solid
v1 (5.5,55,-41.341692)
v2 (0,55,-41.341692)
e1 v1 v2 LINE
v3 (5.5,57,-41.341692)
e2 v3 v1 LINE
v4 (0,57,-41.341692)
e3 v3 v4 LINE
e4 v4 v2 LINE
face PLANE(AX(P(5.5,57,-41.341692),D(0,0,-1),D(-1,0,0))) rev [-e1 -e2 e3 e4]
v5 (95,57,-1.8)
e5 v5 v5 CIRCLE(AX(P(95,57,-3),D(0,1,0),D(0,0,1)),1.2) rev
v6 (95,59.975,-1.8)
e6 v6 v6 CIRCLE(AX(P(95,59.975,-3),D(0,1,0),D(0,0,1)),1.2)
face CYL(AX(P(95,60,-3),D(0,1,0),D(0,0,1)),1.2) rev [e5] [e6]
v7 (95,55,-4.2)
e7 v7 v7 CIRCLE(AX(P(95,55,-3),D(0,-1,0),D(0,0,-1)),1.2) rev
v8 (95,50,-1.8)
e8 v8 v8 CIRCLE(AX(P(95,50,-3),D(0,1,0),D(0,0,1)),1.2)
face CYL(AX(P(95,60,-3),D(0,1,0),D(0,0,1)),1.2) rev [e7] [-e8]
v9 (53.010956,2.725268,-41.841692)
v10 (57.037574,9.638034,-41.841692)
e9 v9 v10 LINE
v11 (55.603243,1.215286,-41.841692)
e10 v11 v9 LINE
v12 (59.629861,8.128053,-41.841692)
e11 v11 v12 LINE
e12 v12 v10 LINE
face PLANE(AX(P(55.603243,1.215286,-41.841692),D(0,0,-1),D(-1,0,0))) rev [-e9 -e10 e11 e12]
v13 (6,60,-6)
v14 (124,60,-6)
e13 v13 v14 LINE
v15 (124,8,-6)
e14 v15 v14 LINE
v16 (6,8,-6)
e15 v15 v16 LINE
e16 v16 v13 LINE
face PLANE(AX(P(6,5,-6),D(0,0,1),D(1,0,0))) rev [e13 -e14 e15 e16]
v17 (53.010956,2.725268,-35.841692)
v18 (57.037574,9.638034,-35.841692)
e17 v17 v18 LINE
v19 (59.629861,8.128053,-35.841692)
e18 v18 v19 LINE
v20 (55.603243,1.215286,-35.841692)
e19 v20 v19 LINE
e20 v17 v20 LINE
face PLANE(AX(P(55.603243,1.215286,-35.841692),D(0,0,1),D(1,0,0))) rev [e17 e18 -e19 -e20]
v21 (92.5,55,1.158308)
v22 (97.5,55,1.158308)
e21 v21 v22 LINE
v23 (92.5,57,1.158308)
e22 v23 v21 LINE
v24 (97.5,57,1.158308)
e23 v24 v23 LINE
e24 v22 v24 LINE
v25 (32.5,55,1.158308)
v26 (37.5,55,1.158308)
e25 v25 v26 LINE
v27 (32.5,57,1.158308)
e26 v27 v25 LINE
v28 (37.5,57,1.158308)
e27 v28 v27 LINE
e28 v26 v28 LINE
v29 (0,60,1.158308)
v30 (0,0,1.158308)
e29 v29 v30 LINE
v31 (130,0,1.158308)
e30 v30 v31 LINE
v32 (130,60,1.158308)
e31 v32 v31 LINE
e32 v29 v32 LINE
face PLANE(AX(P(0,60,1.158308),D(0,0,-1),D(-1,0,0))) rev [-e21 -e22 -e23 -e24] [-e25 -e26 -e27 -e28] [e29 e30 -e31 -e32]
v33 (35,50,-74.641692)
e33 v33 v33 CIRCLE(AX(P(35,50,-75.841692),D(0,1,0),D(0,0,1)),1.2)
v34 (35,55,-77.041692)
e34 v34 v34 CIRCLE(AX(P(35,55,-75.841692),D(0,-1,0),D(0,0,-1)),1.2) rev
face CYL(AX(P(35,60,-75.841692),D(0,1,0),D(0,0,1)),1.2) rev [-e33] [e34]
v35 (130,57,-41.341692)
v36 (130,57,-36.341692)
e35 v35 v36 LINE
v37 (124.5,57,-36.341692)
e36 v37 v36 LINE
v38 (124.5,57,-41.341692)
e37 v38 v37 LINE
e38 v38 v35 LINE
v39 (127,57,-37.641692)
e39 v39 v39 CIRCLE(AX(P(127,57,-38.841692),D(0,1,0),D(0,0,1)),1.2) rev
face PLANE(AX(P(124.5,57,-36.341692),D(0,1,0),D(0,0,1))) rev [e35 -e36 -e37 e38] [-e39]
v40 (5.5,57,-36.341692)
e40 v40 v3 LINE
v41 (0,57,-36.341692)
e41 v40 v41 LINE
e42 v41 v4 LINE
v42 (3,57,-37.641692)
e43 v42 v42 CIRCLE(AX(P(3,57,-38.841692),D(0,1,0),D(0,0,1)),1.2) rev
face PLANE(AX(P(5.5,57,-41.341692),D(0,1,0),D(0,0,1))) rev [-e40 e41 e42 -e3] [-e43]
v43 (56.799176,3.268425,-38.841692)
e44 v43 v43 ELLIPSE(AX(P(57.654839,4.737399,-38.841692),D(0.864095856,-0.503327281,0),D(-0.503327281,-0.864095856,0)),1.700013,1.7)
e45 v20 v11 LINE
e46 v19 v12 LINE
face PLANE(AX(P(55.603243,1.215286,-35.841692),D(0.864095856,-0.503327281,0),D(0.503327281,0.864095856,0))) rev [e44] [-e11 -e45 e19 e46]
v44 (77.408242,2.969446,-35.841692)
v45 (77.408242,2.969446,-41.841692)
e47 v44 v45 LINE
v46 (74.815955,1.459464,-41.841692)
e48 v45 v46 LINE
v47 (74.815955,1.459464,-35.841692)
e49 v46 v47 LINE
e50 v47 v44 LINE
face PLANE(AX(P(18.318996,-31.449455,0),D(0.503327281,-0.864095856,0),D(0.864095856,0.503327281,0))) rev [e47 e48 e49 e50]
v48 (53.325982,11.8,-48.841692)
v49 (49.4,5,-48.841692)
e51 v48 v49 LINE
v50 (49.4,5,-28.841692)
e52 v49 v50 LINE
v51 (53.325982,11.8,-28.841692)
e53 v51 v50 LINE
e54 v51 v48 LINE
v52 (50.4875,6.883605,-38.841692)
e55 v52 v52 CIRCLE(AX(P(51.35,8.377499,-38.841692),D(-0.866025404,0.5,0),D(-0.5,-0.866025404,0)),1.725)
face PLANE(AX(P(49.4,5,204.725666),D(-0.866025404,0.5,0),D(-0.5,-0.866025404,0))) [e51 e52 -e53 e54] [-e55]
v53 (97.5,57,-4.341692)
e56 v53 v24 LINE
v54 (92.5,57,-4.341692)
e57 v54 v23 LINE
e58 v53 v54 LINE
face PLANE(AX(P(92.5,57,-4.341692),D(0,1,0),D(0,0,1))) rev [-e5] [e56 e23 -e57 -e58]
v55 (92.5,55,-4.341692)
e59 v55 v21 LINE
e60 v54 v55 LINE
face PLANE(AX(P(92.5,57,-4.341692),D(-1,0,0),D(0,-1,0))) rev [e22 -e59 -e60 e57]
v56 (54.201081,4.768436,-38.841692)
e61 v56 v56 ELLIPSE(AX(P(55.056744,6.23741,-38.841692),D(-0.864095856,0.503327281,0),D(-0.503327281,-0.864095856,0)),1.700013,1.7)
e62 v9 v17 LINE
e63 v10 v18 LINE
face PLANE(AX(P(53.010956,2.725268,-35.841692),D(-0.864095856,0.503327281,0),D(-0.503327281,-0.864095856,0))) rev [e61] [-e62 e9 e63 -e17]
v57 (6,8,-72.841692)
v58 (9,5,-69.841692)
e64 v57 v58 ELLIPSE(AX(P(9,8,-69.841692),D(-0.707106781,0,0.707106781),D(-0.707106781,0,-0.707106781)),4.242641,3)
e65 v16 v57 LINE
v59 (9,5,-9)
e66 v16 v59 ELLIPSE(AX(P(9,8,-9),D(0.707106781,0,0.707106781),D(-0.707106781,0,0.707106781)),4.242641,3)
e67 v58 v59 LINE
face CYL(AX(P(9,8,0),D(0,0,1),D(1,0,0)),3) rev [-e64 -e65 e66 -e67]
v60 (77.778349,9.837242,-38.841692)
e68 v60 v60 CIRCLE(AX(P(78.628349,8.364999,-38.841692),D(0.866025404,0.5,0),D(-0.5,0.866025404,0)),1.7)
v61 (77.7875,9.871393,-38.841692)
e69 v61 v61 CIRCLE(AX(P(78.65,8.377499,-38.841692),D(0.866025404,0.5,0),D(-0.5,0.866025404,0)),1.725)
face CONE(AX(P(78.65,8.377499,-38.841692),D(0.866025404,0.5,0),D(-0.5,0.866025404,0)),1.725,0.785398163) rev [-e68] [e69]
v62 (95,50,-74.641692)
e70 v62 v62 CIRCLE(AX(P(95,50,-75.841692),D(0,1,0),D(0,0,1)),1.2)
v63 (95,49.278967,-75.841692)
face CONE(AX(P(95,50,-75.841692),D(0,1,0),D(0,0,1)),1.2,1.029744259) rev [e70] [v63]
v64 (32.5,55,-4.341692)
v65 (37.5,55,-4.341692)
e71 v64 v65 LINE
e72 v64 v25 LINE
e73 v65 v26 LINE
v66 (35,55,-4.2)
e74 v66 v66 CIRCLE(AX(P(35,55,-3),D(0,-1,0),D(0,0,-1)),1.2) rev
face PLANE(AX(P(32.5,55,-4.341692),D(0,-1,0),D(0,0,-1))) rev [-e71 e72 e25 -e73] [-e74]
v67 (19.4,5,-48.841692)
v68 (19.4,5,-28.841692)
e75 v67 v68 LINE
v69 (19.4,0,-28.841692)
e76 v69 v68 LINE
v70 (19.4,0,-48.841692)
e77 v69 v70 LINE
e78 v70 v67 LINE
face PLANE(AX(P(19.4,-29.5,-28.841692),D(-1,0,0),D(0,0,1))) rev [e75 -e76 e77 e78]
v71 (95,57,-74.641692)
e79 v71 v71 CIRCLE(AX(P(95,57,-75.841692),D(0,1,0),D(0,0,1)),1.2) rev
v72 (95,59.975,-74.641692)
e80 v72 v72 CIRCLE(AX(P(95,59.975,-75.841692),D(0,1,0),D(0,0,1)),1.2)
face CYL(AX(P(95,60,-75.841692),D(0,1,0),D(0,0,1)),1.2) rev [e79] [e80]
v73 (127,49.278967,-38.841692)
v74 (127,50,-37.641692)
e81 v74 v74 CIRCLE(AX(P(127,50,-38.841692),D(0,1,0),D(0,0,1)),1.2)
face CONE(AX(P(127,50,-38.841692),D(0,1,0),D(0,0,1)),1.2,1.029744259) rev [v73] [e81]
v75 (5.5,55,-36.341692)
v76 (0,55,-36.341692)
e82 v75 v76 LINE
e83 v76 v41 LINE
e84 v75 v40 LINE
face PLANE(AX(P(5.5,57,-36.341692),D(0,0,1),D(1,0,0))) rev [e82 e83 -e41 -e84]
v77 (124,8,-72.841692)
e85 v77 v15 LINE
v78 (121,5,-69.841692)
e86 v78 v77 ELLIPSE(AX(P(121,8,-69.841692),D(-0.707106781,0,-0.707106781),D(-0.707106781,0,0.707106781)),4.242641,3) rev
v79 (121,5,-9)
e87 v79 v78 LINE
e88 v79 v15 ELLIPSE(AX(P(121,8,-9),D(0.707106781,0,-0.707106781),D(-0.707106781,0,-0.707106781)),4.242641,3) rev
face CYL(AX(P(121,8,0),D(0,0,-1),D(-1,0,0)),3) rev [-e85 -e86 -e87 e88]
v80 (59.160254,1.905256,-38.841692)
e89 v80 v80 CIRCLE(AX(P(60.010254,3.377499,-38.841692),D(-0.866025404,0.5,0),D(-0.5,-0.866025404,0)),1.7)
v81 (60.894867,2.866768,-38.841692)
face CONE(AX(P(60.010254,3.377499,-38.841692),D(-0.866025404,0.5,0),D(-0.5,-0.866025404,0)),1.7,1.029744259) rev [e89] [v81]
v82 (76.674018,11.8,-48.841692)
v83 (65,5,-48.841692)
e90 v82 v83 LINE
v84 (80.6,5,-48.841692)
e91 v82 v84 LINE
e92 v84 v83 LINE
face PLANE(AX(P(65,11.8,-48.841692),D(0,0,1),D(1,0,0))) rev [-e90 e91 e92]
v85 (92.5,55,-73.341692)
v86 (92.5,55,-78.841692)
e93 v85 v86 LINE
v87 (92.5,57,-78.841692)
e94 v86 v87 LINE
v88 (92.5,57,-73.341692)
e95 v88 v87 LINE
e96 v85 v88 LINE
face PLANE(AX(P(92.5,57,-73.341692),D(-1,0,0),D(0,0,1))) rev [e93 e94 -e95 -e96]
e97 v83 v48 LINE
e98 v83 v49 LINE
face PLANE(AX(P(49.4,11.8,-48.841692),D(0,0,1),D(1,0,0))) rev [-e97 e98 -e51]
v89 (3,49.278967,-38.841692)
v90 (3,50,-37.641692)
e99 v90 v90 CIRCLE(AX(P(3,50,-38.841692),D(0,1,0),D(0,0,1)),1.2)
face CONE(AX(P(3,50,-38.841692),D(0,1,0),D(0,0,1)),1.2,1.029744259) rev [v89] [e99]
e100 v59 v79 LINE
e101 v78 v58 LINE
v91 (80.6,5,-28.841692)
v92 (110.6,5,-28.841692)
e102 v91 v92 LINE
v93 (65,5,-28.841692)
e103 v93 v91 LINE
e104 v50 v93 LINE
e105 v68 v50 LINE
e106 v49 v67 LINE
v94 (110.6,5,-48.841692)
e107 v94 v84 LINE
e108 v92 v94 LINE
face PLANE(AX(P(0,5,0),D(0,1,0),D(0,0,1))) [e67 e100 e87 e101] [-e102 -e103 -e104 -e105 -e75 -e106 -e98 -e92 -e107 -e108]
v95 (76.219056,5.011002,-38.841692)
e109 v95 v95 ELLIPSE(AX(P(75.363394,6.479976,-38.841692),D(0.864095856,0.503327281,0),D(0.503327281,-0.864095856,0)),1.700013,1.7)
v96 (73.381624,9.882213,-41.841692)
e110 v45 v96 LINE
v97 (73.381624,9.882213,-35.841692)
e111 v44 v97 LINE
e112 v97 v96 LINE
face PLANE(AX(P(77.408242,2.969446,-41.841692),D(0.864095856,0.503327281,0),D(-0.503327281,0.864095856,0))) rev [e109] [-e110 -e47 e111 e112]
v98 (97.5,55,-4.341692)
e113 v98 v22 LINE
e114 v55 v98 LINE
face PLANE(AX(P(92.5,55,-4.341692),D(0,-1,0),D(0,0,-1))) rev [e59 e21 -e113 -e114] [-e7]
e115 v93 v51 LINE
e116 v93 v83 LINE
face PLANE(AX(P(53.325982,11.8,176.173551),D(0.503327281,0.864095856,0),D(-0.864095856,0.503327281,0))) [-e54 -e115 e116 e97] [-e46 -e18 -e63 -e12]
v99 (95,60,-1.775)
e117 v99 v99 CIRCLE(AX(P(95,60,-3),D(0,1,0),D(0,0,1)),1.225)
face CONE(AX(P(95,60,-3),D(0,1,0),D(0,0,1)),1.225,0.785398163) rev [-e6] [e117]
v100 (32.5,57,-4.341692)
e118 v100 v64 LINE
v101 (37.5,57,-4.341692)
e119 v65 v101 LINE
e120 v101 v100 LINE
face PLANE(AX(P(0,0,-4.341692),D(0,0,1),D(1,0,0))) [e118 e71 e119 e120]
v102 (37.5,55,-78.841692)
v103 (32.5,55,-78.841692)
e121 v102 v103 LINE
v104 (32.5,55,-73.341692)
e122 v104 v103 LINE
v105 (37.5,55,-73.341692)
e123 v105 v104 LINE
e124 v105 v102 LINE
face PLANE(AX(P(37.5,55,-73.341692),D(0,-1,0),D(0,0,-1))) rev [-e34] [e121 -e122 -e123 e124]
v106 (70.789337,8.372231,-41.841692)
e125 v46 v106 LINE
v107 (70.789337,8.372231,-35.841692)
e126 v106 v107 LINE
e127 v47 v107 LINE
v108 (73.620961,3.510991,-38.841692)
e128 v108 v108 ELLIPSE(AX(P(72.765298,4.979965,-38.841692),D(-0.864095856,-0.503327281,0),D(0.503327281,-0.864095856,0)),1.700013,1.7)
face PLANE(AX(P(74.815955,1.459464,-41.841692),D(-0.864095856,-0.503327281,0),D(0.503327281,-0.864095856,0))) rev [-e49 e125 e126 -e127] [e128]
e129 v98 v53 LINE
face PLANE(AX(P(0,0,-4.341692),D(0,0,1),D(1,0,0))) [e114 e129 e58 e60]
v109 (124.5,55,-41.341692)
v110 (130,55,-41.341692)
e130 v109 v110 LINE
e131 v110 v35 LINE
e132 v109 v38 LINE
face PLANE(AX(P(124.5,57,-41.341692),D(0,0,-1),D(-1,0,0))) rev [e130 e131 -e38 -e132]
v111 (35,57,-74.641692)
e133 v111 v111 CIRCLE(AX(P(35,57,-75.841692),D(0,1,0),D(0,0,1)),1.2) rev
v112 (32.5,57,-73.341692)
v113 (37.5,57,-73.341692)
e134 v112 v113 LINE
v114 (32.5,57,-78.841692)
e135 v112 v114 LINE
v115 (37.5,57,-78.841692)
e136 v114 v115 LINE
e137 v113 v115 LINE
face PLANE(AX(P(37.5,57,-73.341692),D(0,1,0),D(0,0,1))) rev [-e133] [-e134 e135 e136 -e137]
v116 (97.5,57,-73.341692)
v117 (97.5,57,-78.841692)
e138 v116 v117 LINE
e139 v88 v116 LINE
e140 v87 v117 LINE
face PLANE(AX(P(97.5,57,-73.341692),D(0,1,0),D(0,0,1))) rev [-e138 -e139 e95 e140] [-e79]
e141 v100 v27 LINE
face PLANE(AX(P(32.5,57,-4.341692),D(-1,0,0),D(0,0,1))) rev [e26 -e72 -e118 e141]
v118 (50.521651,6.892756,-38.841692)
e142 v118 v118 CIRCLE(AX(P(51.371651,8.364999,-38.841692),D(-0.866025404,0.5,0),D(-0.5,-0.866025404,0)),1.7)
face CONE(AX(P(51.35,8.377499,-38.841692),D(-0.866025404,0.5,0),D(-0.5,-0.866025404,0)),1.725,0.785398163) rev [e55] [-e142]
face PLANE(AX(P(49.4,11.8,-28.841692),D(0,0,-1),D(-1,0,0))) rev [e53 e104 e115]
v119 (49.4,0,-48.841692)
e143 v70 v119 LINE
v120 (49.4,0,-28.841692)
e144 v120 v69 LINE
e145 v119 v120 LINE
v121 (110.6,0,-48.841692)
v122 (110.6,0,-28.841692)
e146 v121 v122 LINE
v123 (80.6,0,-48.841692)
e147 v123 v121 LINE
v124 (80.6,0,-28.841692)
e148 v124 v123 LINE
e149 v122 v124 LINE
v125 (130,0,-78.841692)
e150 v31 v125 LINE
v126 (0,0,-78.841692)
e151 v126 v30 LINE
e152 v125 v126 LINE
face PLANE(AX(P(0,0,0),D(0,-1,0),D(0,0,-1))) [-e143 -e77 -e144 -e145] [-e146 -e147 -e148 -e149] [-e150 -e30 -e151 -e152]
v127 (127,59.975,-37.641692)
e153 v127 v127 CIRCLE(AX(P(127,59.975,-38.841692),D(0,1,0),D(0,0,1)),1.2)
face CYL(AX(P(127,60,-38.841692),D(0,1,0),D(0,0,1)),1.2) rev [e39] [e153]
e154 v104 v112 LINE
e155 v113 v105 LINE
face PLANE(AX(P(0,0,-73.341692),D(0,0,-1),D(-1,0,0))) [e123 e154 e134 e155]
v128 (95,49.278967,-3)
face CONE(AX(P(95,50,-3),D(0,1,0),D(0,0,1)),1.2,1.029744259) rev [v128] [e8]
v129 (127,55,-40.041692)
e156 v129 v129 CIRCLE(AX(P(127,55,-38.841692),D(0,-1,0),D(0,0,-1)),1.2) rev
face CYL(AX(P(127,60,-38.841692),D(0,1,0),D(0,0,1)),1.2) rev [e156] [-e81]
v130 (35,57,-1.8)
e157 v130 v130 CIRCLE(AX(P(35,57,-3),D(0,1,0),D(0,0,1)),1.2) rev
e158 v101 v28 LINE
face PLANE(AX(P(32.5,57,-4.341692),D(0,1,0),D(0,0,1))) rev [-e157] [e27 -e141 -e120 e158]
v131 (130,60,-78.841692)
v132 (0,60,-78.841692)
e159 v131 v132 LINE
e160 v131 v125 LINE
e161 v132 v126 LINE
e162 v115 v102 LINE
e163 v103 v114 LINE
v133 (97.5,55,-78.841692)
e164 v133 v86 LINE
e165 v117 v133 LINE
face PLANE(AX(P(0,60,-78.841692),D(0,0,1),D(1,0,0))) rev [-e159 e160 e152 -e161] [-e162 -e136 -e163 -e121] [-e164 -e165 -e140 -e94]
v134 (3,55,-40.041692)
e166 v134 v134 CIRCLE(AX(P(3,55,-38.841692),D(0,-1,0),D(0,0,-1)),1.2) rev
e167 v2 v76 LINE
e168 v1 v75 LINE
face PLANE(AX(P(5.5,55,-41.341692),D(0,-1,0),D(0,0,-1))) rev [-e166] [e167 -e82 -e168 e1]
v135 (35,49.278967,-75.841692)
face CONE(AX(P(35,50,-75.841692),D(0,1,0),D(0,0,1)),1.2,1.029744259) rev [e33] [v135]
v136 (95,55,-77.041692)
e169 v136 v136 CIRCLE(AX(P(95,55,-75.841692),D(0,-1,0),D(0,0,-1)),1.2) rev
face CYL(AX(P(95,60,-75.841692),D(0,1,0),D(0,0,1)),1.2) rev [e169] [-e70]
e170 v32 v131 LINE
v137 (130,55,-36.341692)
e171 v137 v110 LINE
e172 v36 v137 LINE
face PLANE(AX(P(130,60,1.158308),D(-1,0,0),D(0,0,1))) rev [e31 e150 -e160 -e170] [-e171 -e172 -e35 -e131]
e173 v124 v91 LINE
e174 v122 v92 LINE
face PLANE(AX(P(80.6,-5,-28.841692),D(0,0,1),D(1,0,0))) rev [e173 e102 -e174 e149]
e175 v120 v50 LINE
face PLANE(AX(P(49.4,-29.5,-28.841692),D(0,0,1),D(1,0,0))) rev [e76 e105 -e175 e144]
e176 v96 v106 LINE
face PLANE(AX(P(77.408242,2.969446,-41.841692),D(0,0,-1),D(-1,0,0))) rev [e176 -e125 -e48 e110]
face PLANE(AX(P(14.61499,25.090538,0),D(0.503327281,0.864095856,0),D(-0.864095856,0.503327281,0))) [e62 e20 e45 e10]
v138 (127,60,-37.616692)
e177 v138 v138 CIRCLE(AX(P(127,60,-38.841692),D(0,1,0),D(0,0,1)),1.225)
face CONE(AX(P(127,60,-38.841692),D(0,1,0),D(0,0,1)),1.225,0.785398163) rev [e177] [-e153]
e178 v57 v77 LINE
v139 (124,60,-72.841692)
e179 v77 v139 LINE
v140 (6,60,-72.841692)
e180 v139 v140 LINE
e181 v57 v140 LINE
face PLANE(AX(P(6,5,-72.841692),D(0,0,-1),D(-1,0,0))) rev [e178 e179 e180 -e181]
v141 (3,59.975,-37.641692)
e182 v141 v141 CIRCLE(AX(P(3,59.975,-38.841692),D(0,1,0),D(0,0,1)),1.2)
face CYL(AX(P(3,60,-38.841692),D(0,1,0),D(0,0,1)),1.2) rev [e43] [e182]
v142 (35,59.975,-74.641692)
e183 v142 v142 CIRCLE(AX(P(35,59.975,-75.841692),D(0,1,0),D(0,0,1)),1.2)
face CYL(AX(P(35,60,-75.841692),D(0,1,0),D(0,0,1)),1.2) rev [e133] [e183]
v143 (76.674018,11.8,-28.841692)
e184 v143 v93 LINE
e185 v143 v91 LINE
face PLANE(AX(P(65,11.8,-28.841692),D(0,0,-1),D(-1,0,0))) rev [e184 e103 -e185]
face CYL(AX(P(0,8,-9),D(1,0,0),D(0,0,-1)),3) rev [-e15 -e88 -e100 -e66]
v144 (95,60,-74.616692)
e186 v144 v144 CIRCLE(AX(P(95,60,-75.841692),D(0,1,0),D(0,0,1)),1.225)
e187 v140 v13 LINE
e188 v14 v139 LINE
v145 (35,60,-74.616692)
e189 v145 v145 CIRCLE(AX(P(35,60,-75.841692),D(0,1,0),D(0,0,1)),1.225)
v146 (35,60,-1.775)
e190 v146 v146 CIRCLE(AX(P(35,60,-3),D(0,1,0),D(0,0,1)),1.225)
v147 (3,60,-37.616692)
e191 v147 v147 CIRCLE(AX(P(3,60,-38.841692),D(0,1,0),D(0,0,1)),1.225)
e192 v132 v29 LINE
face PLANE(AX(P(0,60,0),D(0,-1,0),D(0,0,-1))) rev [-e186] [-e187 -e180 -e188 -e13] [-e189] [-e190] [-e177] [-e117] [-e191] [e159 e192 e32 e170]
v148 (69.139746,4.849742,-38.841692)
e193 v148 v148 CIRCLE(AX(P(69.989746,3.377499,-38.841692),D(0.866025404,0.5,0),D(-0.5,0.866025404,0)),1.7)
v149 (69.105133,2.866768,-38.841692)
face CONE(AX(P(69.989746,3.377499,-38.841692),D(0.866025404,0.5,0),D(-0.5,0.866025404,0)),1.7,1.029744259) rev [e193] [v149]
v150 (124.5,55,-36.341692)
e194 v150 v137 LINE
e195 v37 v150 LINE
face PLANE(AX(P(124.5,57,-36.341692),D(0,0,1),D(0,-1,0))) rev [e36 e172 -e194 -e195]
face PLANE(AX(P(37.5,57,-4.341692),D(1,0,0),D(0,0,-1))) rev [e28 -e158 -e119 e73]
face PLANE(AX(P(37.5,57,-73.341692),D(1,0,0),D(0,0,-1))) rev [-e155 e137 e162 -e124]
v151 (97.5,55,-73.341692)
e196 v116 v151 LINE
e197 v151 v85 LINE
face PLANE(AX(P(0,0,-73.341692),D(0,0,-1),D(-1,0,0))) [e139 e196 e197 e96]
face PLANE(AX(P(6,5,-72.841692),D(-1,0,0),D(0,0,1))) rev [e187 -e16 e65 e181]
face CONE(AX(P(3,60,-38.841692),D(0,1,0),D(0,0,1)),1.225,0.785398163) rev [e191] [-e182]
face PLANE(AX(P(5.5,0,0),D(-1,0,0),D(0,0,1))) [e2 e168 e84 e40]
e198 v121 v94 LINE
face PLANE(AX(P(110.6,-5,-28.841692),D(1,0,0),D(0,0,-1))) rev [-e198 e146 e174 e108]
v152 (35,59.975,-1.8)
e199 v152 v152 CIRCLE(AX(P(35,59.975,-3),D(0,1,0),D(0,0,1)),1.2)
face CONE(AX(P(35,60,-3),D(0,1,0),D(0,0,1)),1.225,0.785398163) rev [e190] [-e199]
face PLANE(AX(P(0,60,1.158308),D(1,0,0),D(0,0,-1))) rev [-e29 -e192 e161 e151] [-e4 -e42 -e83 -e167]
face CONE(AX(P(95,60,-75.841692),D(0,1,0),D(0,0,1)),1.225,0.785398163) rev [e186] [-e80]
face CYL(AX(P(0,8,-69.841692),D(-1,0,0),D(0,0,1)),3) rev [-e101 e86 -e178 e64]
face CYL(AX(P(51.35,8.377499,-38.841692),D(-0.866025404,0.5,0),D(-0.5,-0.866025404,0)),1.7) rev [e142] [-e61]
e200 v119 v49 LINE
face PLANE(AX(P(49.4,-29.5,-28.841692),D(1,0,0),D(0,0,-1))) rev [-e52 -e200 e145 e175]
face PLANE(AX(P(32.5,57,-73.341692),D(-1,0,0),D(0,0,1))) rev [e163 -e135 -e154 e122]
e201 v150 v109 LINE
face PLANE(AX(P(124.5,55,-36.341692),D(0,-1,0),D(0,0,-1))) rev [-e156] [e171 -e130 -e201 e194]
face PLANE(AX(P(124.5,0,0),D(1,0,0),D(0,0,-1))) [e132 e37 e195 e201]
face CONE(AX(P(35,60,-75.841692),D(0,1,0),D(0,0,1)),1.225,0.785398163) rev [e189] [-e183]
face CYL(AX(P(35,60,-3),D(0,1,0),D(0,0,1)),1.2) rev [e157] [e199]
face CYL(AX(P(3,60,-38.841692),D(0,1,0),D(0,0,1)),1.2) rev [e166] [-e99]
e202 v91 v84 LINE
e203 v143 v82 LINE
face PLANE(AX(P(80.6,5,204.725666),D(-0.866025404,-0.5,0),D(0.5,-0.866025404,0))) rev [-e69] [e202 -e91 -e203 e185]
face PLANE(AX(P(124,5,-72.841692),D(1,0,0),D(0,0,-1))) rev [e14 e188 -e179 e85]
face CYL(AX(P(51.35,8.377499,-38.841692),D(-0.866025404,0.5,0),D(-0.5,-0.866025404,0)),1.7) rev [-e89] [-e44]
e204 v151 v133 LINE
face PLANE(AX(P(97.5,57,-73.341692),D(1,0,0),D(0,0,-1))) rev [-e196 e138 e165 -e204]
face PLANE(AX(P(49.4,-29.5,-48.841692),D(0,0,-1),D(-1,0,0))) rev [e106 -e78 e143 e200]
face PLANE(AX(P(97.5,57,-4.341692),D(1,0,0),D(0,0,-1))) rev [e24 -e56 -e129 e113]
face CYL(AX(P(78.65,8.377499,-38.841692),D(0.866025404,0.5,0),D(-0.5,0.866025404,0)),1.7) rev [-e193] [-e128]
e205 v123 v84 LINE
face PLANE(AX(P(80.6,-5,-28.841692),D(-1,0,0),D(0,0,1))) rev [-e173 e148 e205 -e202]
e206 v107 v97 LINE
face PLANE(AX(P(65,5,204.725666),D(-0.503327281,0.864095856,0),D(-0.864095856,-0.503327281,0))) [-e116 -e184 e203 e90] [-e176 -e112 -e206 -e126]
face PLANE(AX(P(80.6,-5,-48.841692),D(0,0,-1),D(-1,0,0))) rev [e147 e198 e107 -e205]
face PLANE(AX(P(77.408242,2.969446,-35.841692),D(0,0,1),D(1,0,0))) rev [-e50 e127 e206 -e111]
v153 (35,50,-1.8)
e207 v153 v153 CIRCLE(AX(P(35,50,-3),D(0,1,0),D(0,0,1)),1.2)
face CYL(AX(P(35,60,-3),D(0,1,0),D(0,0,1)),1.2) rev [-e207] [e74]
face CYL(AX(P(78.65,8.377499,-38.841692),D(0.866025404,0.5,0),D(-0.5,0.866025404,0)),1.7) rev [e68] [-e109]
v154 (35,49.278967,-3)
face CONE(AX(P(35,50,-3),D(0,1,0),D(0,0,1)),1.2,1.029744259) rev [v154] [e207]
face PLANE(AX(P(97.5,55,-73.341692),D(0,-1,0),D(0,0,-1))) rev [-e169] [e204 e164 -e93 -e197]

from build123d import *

# Parameters (mm, degrees)
SKIZZE1_W                                  = 130
SKIZZE1_H                                  = 80
AUFSATZ_LINEAR_AUSTRAGEN1_DEPTH            = 60
SKIZZE2_W                                  = 118
SKIZZE2_H                                  = 66.841692054
SCHNITT_LINEAR_AUSTRAGEN1_DEPTH            = 55
SKIZZE3_W                                  = 15.6
SKIZZE3_H                                  = 20
AUFSATZ_LINEAR_AUSTRAGEN2_DEPTH            = 6.8
SCHNITT_LINEAR_START                       = -20
SCHNITT_LINEAR_AUSTRAGEN10_DEPTH           = 20
SCHNITT_LINEAR_AUSTRAGEN11_DEPTH           = 20
SKIZZE16_W                                 = 15.6
SKIZZE16_H                                 = 20
AUFSATZ_LINEAR_AUSTRAGEN3_DEPTH            = 6.8
SCHNITT_LINEAR_AUSTRAGEN12_DEPTH           = 20
SCHNITT_LINEAR_AUSTRAGEN13_DEPTH           = 20
SKIZZE21_W                                 = 30
SKIZZE21_H                                 = 20
SCHNITT_LINEAR_AUSTRAGEN14_DEPTH           = 10
SKIZZE23_W                                 = 3
SKIZZE23_H                                 = 6
SCHNITT_LINEAR_AUSTRAGEN16_DEPTH           = 8
SKIZZE24_W                                 = 3
SKIZZE24_H                                 = 6
SCHNITT_LINEAR_AUSTRAGEN17_DEPTH           = 8
F_3_4_3_4_DURCHMESSER_BOHRUNG2_D           = 3.4
F_3_4_3_4_DURCHMESSER_BOHRUNG2_DEPTH       = 10
F_3_4_3_4_DURCHMESSER_BOHRUNG2_CSINK_D     = 3.45
F_3_4_3_4_DURCHMESSER_BOHRUNG2_CSINK_ANGLE = 90
F_3_4_3_4_DURCHMESSER_BOHRUNG2_TIP         = 1.021463052
F_2_4_2_4_DURCHMESSER_BOHRUNG1_D           = 2.4
F_2_4_2_4_DURCHMESSER_BOHRUNG1_DEPTH       = 10
F_2_4_2_4_DURCHMESSER_BOHRUNG1_CSINK_D     = 2.45
F_2_4_2_4_DURCHMESSER_BOHRUNG1_CSINK_ANGLE = 90
F_2_4_2_4_DURCHMESSER_BOHRUNG1_TIP         = 0.721032743
SKIZZE33_W                                 = 5
SKIZZE33_H                                 = 2
SCHNITT_LINEAR_AUSTRAGEN18_DEPTH           = 5.5
SKIZZE22_W                                 = 30
SKIZZE22_H                                 = 20
SCHNITT_LINEAR_AUSTRAGEN19_DEPTH           = 34.5
F_3_4_3_4_DURCHMESSER_BOHRUNG3_D           = 3.4
F_3_4_3_4_DURCHMESSER_BOHRUNG3_DEPTH       = 10
F_3_4_3_4_DURCHMESSER_BOHRUNG3_CSINK_D     = 3.45
F_3_4_3_4_DURCHMESSER_BOHRUNG3_CSINK_ANGLE = 90
F_3_4_3_4_DURCHMESSER_BOHRUNG3_TIP         = 1.021463052
SKIZZE37_W                                 = 5
SKIZZE37_H                                 = 2
SCHNITT_LINEAR_AUSTRAGEN21_DEPTH           = 5.5
SKIZZE38_W                                 = 5
SKIZZE38_H                                 = 2
SCHNITT_LINEAR_AUSTRAGEN22_DEPTH           = 5.5
SKIZZE39_W                                 = 5
SKIZZE39_H                                 = 2
SCHNITT_LINEAR_AUSTRAGEN23_DEPTH           = 5.5
VERRUNDUNG3_R                              = 3


# Read off the part's stored shape, not the designer's step: Schnitt-Linear austragen10, Schnitt-Linear austragen11, Schnitt-Linear austragen12, Schnitt-Linear austragen13
with BuildPart() as part:
    # Skizze1 → Aufsatz-Linear austragen1 (new body)
    with BuildSketch(Plane(origin=(0, 0, 0), x_dir=(1, 0, 0), z_dir=(0, 1, 0))):
        with Locations((65, 38.841692054)):
            Rectangle(SKIZZE1_W, SKIZZE1_H)
    extrude(amount=AUFSATZ_LINEAR_AUSTRAGEN1_DEPTH)

    # Skizze2 → Schnitt-Linear austragen1 (cut)
    with BuildSketch(Plane(origin=(0, 60, 0), x_dir=(1, 0, 0), z_dir=(0, 1, 0))):
        with Locations((65, 39.420846027)):
            Rectangle(SKIZZE2_W, SKIZZE2_H)
    extrude(amount=-SCHNITT_LINEAR_AUSTRAGEN1_DEPTH, mode=Mode.SUBTRACT)

    # Skizze3 → Aufsatz-Linear austragen2 (add)
    with BuildSketch(Plane(origin=(0, 5, 0), x_dir=(1, 0, 0), z_dir=(0, 1, 0))):
        with Locations((57.2, 38.841692054)):
            Rectangle(SKIZZE3_W, SKIZZE3_H)
    extrude(amount=AUFSATZ_LINEAR_AUSTRAGEN2_DEPTH)

    # Schnitt-Linear austragen10 outline → Schnitt-Linear austragen10 (cut)
    with BuildSketch(Plane.XY.offset(-28.841692054).offset(SCHNITT_LINEAR_START)):
        Polygon((49.4, 5), (53.32598183, 11.8), (49.4, 11.8), align=None)
    extrude(amount=SCHNITT_LINEAR_AUSTRAGEN10_DEPTH, mode=Mode.SUBTRACT)

    # Schnitt-Linear austragen11 outline → Schnitt-Linear austragen11 (cut)
    with BuildSketch(Plane.XY.offset(-28.841692054).offset(SCHNITT_LINEAR_START)):
        Polygon((53.32598183, 11.8), (65, 5), (65, 11.8), align=None)
    extrude(amount=SCHNITT_LINEAR_AUSTRAGEN11_DEPTH, mode=Mode.SUBTRACT)

    # Skizze16 → Aufsatz-Linear austragen3 (add)
    with BuildSketch(Plane(origin=(0, 5, 0), x_dir=(1, 0, 0), z_dir=(0, 1, 0))):
        with Locations((72.8, 38.841692054)):
            Rectangle(SKIZZE16_W, SKIZZE16_H)
    extrude(amount=AUFSATZ_LINEAR_AUSTRAGEN3_DEPTH)

    # Schnitt-Linear austragen12 outline → Schnitt-Linear austragen12 (cut)
    with BuildSketch(Plane.XY.offset(-28.841692054).offset(SCHNITT_LINEAR_START)):
        Polygon((80.6, 11.8), (76.67401817, 11.8), (80.6, 5), align=None)
    extrude(amount=SCHNITT_LINEAR_AUSTRAGEN12_DEPTH, mode=Mode.SUBTRACT)

    # Schnitt-Linear austragen13 outline → Schnitt-Linear austragen13 (cut)
    with BuildSketch(Plane.XY.offset(-28.841692054).offset(SCHNITT_LINEAR_START)):
        Polygon((65, 5), (76.67401817, 11.8), (65, 11.8), align=None)
    extrude(amount=SCHNITT_LINEAR_AUSTRAGEN13_DEPTH, mode=Mode.SUBTRACT)

    # Skizze21 → Schnitt-Linear austragen14 (cut)
    with BuildSketch(Plane(origin=(0, 5, 0), x_dir=(1, 0, 0), z_dir=(0, 1, 0))):
        with Locations((95.6, 38.841692054)):
            Rectangle(SKIZZE21_W, SKIZZE21_H)
    extrude(amount=-SCHNITT_LINEAR_AUSTRAGEN14_DEPTH, mode=Mode.SUBTRACT)

    # Skizze23 → Schnitt-Linear austragen16 (cut)
    with BuildSketch(Plane(origin=(14.292377765, -24.536687899, 0), x_dir=(0.8640958560374116, 0.5033272807815734, 0), z_dir=(-0.5033272807815734, 0.8640958560374116, 0))):
        with Locations((66.882744729, 38.841692054)):
            Rectangle(SKIZZE23_W, SKIZZE23_H)
    extrude(amount=-SCHNITT_LINEAR_AUSTRAGEN16_DEPTH, mode=Mode.SUBTRACT)

    # Skizze24 → Schnitt-Linear austragen17 (cut)
    with BuildSketch(Plane(origin=(18.64160794, 32.003304383, 0), x_dir=(0.8640958560374131, -0.5033272807815709, 0), z_dir=(0.5033272807815709, 0.8640958560374132, 0))):
        with Locations((45.934845453, 38.841692054)):
            Rectangle(SKIZZE24_W, SKIZZE24_H)
    extrude(amount=-SCHNITT_LINEAR_AUSTRAGEN17_DEPTH, mode=Mode.SUBTRACT)

    # Ø3.4 (3.4) Durchmesser Bohrung2
    with Locations(Plane(origin=(62.615063509, 36.150823773, 0), x_dir=(0, 0, -1), z_dir=(0.8660254037844358, 0.5000000000000049, 0))):
        with Locations((38.841692054, -32.069872981)):
            CounterSinkHole(F_3_4_3_4_DURCHMESSER_BOHRUNG2_D / 2, F_3_4_3_4_DURCHMESSER_BOHRUNG2_CSINK_D / 2, depth=F_3_4_3_4_DURCHMESSER_BOHRUNG2_DEPTH, counter_sink_angle=F_3_4_3_4_DURCHMESSER_BOHRUNG2_CSINK_ANGLE)
            with Locations((0, 0, -(F_3_4_3_4_DURCHMESSER_BOHRUNG2_DEPTH + F_3_4_3_4_DURCHMESSER_BOHRUNG2_TIP / 2))):  # 118° drill point
                Cone(0, F_3_4_3_4_DURCHMESSER_BOHRUNG2_D / 2, F_3_4_3_4_DURCHMESSER_BOHRUNG2_TIP, mode=Mode.SUBTRACT)

    # Ø2.4 (2.4) Durchmesser Bohrung1
    with Locations(Plane(origin=(0, 60, 0), x_dir=(1, 0, 0), z_dir=(0, 1, 0))):
        with Locations((127, 38.841692054), (95, 75.841692054), (35, 75.841692054), (35, 3), (95, 3), (3, 38.841692054), (132.023901178, -13.702298919)):
            CounterSinkHole(F_2_4_2_4_DURCHMESSER_BOHRUNG1_D / 2, F_2_4_2_4_DURCHMESSER_BOHRUNG1_CSINK_D / 2, depth=F_2_4_2_4_DURCHMESSER_BOHRUNG1_DEPTH, counter_sink_angle=F_2_4_2_4_DURCHMESSER_BOHRUNG1_CSINK_ANGLE)
            with Locations((0, 0, -(F_2_4_2_4_DURCHMESSER_BOHRUNG1_DEPTH + F_2_4_2_4_DURCHMESSER_BOHRUNG1_TIP / 2))):  # 118° drill point
                Cone(0, F_2_4_2_4_DURCHMESSER_BOHRUNG1_D / 2, F_2_4_2_4_DURCHMESSER_BOHRUNG1_TIP, mode=Mode.SUBTRACT)

    # Skizze33 → Schnitt-Linear austragen18 (cut)
    with BuildSketch(Plane(origin=(0, 0, -78.841692054), x_dir=(-1, 0, 0), z_dir=(0, 0, -1))):
        with Locations((-95, 56)):
            Rectangle(SKIZZE33_W, SKIZZE33_H)
        with Locations((-35, 56)):
            Rectangle(SKIZZE33_W, SKIZZE33_H)
    extrude(amount=-SCHNITT_LINEAR_AUSTRAGEN18_DEPTH, mode=Mode.SUBTRACT)

    # Skizze22 → Schnitt-Linear austragen19 (cut)
    with BuildSketch(Plane(origin=(0, 5, 0), x_dir=(1, 0, 0), z_dir=(0, 1, 0))):
        with Locations((34.4, 38.841692054)):
            Rectangle(SKIZZE22_W, SKIZZE22_H)
    extrude(amount=-SCHNITT_LINEAR_AUSTRAGEN19_DEPTH, mode=Mode.SUBTRACT)

    # Ø3.4 (3.4) Durchmesser Bohrung3
    with Locations(Plane(origin=(34.884936491, -20.140827473, 0), x_dir=(0, 0, 1), z_dir=(-0.8660254037844404, 0.49999999999999695, 0))):
        with Locations((-38.841692054, 32.930127019)):
            CounterSinkHole(F_3_4_3_4_DURCHMESSER_BOHRUNG3_D / 2, F_3_4_3_4_DURCHMESSER_BOHRUNG3_CSINK_D / 2, depth=F_3_4_3_4_DURCHMESSER_BOHRUNG3_DEPTH, counter_sink_angle=F_3_4_3_4_DURCHMESSER_BOHRUNG3_CSINK_ANGLE)
            with Locations((0, 0, -(F_3_4_3_4_DURCHMESSER_BOHRUNG3_DEPTH + F_3_4_3_4_DURCHMESSER_BOHRUNG3_TIP / 2))):  # 118° drill point
                Cone(0, F_3_4_3_4_DURCHMESSER_BOHRUNG3_D / 2, F_3_4_3_4_DURCHMESSER_BOHRUNG3_TIP, mode=Mode.SUBTRACT)

    # Skizze37 → Schnitt-Linear austragen21 (cut)
    with BuildSketch(Plane.XY.offset(1.158307946)):
        with Locations((35, 56)):
            Rectangle(SKIZZE37_W, SKIZZE37_H)
        with Locations((95, 56)):
            Rectangle(SKIZZE37_W, SKIZZE37_H)
    extrude(amount=-SCHNITT_LINEAR_AUSTRAGEN21_DEPTH, mode=Mode.SUBTRACT)

    # Skizze38 → Schnitt-Linear austragen22 (cut)
    with BuildSketch(Plane(origin=(130, 0, 0), x_dir=(0, 0, -1), z_dir=(1, 0, 0))):
        with Locations((38.841692054, 56)):
            Rectangle(SKIZZE38_W, SKIZZE38_H)
    extrude(amount=-SCHNITT_LINEAR_AUSTRAGEN22_DEPTH, mode=Mode.SUBTRACT)

    # Skizze39 → Schnitt-Linear austragen23 (cut)
    with BuildSketch(Plane.ZY):
        with Locations((-38.841692054, 56)):
            Rectangle(SKIZZE39_W, SKIZZE39_H)
    extrude(amount=-SCHNITT_LINEAR_AUSTRAGEN23_DEPTH, mode=Mode.SUBTRACT)

    # Verrundung3
    verrundung3_edges = [part.edges().sort_by_distance(p)[0] for p in [
        (6, 5, -39.420846027),
        (65, 5, -72.841692054),
        (124, 5, -39.420846027),
        (65, 5, -6),
    ]]
    fillet(verrundung3_edges, radius=VERRUNDUNG3_R)


solid = part.part
